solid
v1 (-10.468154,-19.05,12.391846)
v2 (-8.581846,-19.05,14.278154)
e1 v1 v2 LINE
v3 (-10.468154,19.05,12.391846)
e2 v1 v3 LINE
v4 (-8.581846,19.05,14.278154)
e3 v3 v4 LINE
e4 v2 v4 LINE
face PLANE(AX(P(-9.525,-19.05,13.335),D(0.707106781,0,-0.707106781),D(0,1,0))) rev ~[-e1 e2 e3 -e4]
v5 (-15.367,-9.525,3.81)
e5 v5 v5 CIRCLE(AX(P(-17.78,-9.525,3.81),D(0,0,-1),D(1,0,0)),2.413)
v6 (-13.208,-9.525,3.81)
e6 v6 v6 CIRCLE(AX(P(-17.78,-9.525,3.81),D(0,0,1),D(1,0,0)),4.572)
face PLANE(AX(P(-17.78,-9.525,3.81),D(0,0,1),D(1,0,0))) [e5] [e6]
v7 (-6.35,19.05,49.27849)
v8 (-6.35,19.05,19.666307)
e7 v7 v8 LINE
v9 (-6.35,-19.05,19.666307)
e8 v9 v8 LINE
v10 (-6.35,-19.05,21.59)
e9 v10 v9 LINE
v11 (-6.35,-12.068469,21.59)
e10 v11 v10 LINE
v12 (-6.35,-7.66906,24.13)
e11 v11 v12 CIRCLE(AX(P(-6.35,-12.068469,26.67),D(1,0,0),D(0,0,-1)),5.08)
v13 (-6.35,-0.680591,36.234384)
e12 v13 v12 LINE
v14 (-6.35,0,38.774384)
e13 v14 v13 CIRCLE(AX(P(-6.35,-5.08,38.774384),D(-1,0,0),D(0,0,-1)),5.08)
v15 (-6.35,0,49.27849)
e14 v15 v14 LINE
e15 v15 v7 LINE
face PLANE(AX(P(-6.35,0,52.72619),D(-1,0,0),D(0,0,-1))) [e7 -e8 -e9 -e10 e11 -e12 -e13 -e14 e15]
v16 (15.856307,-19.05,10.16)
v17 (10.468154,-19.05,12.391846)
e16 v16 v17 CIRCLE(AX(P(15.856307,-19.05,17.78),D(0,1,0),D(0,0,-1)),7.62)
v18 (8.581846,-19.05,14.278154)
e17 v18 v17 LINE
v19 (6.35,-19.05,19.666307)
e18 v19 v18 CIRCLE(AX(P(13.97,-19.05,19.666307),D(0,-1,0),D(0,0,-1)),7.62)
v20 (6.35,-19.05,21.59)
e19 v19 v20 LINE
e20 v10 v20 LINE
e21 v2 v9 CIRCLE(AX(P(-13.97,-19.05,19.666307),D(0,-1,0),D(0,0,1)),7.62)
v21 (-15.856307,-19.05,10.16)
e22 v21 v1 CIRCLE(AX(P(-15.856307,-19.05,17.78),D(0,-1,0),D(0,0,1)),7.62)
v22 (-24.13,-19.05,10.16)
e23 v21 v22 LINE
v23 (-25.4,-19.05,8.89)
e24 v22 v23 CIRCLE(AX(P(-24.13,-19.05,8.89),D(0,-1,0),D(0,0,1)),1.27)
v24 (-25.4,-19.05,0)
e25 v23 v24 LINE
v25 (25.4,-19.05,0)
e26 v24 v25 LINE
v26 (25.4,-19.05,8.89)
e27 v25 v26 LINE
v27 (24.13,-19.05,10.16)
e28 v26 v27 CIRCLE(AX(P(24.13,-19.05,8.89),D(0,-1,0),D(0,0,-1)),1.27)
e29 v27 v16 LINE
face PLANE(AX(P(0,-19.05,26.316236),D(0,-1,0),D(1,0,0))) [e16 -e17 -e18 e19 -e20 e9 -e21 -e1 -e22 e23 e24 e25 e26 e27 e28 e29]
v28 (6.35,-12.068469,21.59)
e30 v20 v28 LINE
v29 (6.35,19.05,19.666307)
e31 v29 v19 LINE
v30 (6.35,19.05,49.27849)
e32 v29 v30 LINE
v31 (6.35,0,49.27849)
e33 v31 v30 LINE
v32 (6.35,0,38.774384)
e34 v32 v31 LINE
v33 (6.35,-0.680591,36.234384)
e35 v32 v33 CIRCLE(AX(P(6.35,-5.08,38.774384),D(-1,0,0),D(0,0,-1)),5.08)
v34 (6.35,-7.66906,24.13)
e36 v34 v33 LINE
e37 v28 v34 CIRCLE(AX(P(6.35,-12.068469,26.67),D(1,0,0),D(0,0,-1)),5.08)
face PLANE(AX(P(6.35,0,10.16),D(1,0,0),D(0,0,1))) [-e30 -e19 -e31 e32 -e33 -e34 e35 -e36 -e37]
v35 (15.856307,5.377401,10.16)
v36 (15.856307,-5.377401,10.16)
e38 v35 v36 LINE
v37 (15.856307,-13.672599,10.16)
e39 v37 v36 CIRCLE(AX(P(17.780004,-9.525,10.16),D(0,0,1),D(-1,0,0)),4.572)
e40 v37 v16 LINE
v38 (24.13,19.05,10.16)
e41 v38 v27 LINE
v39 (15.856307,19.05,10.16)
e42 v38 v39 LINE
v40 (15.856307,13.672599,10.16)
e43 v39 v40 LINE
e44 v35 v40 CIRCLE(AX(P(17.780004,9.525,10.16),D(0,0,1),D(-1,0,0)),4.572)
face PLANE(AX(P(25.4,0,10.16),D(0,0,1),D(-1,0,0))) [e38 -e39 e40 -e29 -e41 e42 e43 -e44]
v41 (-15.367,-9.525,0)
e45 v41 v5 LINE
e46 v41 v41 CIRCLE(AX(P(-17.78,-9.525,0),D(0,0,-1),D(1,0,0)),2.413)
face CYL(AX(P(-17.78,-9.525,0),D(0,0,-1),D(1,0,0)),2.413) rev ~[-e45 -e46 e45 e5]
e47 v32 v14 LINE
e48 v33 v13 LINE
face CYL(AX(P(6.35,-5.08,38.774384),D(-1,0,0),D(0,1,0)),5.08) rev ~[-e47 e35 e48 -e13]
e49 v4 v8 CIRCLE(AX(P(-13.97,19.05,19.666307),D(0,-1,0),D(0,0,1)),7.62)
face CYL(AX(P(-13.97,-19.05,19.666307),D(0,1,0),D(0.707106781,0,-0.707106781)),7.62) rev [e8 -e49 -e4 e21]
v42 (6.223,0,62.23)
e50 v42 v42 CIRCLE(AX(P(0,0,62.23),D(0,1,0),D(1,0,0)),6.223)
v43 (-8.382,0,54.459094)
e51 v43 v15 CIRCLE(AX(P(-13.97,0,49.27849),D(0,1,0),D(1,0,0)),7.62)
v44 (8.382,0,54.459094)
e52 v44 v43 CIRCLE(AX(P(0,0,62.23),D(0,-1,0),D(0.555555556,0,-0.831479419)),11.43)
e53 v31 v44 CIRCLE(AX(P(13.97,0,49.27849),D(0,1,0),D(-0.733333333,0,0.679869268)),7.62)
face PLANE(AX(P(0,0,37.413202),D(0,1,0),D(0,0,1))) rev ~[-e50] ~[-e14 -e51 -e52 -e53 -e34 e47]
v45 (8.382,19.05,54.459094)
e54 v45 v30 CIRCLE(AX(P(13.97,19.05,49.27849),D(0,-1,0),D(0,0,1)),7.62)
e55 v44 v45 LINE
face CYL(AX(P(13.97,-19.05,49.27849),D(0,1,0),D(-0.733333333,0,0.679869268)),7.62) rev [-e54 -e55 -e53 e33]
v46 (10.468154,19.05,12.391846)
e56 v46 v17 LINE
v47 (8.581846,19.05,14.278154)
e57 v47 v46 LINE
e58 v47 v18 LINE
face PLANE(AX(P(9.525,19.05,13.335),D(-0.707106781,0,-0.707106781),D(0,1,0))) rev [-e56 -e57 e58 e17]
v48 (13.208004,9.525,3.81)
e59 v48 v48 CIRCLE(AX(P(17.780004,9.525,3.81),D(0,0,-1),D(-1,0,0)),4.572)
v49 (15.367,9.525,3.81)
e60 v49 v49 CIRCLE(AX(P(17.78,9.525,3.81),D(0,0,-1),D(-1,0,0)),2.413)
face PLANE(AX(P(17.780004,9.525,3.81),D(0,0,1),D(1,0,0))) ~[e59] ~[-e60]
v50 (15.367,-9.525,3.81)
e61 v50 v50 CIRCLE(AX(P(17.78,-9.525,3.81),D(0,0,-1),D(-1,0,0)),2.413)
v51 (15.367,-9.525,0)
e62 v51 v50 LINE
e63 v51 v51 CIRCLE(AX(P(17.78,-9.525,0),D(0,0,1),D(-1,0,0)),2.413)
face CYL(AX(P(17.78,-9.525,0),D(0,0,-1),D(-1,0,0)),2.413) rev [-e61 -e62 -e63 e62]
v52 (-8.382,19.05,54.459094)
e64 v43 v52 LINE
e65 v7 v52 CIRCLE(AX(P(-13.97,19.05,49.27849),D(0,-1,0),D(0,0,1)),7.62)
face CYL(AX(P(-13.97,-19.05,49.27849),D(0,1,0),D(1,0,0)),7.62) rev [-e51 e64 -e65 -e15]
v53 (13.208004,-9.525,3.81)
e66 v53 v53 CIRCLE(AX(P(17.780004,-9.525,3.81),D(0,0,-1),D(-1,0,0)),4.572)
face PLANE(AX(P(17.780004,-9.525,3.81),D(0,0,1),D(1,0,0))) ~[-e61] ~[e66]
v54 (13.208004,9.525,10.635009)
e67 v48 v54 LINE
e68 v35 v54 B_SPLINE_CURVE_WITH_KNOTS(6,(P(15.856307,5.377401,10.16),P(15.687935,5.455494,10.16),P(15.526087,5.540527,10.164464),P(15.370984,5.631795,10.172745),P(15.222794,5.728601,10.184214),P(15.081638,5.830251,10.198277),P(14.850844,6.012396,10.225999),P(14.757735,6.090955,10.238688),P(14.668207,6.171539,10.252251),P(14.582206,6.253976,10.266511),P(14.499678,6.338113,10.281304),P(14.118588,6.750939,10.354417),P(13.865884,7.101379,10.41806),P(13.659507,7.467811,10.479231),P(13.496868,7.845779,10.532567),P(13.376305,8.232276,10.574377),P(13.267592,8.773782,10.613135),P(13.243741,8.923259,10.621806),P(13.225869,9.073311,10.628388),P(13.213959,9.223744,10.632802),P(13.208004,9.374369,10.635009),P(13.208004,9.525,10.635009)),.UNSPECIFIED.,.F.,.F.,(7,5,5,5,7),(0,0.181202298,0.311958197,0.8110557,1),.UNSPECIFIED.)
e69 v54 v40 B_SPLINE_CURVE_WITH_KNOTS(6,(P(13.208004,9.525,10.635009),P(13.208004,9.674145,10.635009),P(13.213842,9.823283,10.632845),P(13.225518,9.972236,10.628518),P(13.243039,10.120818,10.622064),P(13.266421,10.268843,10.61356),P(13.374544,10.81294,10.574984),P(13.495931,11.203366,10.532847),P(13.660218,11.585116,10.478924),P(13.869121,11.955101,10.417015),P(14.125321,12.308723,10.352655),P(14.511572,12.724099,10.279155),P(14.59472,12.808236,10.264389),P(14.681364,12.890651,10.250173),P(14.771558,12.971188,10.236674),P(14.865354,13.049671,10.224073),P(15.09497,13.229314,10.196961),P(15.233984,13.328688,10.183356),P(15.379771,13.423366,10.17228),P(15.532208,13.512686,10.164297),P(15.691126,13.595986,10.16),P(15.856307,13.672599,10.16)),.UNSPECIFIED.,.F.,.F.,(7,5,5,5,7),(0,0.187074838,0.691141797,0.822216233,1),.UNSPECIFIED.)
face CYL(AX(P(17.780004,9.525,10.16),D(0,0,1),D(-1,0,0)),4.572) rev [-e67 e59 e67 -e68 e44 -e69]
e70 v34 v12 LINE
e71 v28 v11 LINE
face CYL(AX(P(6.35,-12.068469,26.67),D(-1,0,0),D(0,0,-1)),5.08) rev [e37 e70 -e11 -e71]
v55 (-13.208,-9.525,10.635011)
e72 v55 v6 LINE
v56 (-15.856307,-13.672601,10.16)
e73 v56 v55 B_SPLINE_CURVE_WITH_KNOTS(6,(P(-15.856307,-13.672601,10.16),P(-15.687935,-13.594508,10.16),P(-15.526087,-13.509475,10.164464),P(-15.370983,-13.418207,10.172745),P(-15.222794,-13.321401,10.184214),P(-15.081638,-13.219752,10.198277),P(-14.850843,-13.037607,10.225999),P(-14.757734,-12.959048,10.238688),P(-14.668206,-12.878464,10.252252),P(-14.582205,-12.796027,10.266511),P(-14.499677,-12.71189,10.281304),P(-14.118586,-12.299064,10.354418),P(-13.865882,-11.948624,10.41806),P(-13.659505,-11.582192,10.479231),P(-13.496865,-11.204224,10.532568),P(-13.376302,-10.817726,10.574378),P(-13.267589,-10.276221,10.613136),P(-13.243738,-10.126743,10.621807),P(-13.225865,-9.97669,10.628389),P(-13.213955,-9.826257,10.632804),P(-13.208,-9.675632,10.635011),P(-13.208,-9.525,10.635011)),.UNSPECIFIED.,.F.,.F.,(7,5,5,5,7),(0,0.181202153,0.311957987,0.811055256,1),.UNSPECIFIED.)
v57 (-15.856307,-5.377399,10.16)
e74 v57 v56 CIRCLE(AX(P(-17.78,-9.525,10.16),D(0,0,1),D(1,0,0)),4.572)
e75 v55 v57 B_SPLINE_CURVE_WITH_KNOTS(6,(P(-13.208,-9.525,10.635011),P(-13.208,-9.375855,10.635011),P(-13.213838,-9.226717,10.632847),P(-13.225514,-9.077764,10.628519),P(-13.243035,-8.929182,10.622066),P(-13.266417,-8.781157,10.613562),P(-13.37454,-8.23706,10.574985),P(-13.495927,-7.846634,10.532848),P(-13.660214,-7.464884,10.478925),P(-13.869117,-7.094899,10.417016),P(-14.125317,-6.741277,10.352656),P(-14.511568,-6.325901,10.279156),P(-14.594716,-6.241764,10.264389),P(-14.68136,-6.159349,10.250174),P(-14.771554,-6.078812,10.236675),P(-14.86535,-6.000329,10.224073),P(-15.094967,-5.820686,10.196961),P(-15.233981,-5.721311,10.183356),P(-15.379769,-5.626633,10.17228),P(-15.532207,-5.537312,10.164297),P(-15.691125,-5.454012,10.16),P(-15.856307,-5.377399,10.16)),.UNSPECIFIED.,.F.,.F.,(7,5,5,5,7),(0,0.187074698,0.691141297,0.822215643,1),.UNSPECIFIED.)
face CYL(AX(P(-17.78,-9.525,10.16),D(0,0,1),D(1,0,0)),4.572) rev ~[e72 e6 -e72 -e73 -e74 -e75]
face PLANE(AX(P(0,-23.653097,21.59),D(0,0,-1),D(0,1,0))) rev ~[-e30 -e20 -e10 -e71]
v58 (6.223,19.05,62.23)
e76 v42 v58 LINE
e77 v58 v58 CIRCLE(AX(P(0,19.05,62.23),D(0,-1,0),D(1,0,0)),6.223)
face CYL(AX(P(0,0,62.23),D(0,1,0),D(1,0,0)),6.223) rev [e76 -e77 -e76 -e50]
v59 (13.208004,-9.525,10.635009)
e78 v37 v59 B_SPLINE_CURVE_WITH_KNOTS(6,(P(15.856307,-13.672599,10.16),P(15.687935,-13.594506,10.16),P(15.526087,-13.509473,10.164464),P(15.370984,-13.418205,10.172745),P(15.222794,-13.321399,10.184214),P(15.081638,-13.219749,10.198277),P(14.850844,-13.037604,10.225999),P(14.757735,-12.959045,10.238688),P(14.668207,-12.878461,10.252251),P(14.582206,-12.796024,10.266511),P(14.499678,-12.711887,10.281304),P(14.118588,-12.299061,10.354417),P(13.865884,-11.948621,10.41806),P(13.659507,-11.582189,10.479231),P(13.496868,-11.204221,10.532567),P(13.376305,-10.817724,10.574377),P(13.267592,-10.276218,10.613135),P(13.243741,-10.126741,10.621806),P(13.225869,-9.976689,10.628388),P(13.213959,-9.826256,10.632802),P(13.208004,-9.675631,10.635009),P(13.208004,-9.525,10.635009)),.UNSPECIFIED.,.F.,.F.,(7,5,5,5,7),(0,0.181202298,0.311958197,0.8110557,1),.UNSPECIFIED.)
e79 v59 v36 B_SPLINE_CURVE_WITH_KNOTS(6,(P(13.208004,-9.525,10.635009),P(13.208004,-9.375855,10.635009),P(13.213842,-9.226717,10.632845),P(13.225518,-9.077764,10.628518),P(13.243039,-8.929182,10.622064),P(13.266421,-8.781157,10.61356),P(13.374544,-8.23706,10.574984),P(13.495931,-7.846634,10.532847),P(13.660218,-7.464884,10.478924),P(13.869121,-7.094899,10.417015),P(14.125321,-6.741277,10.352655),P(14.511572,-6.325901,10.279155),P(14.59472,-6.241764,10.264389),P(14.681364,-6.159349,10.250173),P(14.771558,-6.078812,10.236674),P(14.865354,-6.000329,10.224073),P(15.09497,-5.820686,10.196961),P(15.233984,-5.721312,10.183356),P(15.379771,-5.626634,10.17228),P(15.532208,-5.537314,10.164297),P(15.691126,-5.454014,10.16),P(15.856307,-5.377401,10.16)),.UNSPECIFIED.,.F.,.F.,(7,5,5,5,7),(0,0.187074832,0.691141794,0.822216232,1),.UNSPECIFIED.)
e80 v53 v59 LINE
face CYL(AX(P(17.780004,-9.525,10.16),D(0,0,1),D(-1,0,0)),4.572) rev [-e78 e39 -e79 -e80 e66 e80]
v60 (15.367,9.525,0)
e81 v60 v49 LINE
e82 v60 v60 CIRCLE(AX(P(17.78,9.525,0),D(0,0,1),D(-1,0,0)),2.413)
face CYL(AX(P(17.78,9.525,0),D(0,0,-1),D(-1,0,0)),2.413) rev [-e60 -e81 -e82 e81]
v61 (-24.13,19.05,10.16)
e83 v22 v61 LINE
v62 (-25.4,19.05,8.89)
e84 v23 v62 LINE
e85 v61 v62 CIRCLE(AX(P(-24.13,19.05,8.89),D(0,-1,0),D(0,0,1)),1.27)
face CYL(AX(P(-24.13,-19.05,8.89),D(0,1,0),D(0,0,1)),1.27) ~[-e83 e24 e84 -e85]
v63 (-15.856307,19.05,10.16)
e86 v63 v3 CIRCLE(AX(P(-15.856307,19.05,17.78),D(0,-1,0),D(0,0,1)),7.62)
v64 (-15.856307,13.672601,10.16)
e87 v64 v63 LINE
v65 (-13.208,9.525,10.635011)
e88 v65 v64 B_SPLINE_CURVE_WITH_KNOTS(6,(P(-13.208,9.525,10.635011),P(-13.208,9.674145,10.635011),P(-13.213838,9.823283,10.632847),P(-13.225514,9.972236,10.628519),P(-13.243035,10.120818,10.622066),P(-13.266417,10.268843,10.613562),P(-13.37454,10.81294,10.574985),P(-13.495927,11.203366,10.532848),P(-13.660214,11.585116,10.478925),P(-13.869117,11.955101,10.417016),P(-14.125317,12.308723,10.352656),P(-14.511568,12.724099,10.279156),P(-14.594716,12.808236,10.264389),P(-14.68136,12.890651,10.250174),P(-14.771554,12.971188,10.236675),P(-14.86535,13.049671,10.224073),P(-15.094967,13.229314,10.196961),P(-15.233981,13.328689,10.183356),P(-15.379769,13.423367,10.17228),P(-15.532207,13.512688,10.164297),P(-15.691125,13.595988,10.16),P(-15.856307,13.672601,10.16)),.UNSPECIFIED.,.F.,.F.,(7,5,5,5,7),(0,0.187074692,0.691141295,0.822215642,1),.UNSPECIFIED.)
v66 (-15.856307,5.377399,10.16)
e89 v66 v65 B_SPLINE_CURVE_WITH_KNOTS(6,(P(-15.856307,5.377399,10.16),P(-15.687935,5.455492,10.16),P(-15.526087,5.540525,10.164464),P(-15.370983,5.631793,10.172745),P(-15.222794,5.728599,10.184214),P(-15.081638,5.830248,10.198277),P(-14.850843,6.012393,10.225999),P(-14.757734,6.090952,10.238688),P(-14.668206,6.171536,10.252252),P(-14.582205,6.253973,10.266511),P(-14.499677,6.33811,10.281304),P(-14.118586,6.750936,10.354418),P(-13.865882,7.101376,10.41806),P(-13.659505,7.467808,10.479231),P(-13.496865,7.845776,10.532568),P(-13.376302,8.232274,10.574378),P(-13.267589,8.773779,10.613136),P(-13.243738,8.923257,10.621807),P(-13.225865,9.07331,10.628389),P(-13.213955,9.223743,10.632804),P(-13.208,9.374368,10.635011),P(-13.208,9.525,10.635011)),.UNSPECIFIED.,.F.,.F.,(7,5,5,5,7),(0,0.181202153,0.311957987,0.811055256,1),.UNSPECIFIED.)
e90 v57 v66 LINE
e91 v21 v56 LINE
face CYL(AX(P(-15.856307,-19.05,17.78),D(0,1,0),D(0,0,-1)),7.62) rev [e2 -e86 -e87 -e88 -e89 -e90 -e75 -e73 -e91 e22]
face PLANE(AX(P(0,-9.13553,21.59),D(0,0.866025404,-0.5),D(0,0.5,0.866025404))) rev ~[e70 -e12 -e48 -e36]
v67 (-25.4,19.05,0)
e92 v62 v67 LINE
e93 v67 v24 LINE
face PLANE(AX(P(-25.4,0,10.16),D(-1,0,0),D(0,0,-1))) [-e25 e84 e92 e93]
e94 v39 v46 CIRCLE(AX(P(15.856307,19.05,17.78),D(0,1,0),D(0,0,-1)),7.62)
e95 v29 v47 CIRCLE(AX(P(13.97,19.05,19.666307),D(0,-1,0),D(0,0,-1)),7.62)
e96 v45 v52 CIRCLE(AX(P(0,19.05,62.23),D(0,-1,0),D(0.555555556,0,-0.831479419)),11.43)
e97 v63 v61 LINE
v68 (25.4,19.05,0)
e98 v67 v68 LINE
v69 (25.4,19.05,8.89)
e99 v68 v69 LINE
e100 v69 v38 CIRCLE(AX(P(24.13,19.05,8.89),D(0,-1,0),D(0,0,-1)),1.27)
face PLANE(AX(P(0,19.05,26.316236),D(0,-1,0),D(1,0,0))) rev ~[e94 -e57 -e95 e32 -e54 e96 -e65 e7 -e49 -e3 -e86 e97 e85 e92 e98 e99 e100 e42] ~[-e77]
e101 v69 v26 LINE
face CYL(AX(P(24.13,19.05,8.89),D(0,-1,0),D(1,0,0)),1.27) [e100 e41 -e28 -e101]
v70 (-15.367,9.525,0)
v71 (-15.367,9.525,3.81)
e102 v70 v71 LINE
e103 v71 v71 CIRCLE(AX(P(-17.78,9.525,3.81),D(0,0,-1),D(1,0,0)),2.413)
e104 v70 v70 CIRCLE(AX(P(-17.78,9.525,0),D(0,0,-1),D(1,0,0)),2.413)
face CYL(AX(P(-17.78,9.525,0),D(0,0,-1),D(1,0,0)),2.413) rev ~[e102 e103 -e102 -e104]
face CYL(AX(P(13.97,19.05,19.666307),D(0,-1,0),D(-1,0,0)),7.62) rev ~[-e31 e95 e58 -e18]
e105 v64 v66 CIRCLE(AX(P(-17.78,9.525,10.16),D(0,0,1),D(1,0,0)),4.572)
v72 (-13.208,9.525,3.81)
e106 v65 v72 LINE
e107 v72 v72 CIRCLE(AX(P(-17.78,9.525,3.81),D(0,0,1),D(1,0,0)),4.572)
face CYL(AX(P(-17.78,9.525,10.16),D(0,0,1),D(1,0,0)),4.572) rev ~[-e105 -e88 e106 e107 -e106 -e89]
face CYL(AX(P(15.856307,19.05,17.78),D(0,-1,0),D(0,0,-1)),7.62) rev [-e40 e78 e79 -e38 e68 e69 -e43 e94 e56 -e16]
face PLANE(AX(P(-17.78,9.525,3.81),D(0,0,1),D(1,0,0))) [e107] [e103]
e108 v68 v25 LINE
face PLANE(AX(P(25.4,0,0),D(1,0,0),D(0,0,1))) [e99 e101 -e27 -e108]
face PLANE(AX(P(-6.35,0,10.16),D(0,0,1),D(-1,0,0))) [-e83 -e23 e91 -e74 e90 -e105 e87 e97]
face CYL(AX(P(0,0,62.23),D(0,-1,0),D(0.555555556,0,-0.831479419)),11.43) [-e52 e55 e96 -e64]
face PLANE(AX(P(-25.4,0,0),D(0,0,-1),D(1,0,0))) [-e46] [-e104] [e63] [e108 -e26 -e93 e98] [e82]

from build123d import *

# Parameters (mm, degrees)
F0_R          = 6.223
F1_DEPTH      = 19.05
F2_SIZE       = 6.35
F4_R          = 7.62
F3_R          = 2.413
F5_DEPTH      = 73.661
F6_R          = 4.572
F7_DEPTH      = 6.35
F7_DEPTH_BACK = 63.501
F8_R          = 1.27
F10_DEPTH     = 25.4
F11_R         = 5.08


# Not quite as in the source:
# - a pattern or mirror of a feature is missing from the dataset's text; its kind, count and spacing are read off the source's solid


with BuildPart() as f1:
    # F0 (on Front) → F1 (new body, symmetric)
    with BuildSketch(Plane.XZ):
        with BuildLine():
            Line((-25.4, 10.16), (-25.4, 0))
            Line((-25.4, 0), (25.4, 0))
            Line((25.4, 0), (25.4, 10.16))
            Line((25.4, 10.16), (6.35, 10.16))
            Line((6.35, 10.16), (6.35, 52.7261902376))
            ThreePointArc((6.35, 52.7261902376), (0, 73.66), (-6.35, 52.7261902376))
            Line((-6.35, 52.7261902376), (-6.35, 10.16))
            Line((-6.35, 10.16), (-25.4, 10.16))
        make_face()
        with Locations((0, 62.23)):
            Circle(F0_R, mode=Mode.SUBTRACT)
    extrude(amount=F1_DEPTH, both=True)

    # F2
    f2_edges = [f1.edges().sort_by_distance(p)[0] for p in [
        (-6.35, 0, 10.16),
        (6.35, 0, 10.16),
    ]]
    chamfer(f2_edges, length=F2_SIZE)

    # F4
    f4_edges = [f1.edges().sort_by_distance(p)[0] for p in [
        (-6.35, 0, 52.72619),
        (-6.35, 0, 16.51),
        (-12.7, 0, 10.16),
        (12.7, 0, 10.16),
        (6.35, 0, 16.51),
        (6.35, 0, 52.72619),
    ]]
    fillet(f4_edges, radius=F4_R)

    # F3 (on face) → F5 (cut, through all)
    with BuildSketch(Plane(origin=(0, 0, 0), x_dir=(1, 0, 0), z_dir=(0, 0, -1))):
        with Locations((-17.78, 9.525)):
            Circle(F3_R)
        with Locations((-17.78, -9.525)):
            Circle(F3_R)
    f5 = extrude(amount=-F5_DEPTH, mode=Mode.SUBTRACT)

    # F5_copies: F5 across plane
    add(f5.mirror(Plane(origin=(0, 0, 0), x_dir=(0, 0, 1), z_dir=(1, 0, 0))), mode=Mode.SUBTRACT)

    # F6 (on face) → F7 (cut, two sides)
    with BuildSketch(Plane.XY.offset(10.16)) as f7_sk:
        with Locations((-17.78, 9.525)):
            Circle(F6_R)
        with Locations((-17.78, -9.525)):
            Circle(F6_R)
    f7 = extrude(amount=-F7_DEPTH, mode=Mode.SUBTRACT) + extrude(f7_sk.sketch, amount=F7_DEPTH_BACK, mode=Mode.SUBTRACT)

    # F7_copies: F7 across plane
    add(f7.mirror(Plane(origin=(2e-06, 0, 0), x_dir=(0, 0, 1), z_dir=(1, 0, 0))), mode=Mode.SUBTRACT)

    # F8
    f8_edges = [f1.edges().sort_by_distance(p)[0] for p in [
        (-25.4, 0, 10.16),
        (25.4, 0, 10.16),
    ]]
    fillet(f8_edges, radius=F8_R)

    # F9 (on Right) → F10 (cut, symmetric)
    with BuildSketch(Plane.YZ):
        Polygon((0, 37.4132022262), (0, 76.8906995654), (-23.6530974507, 76.8906995654), (-23.6530974507, 21.59), (-9.1355300647, 21.59), align=None)
    extrude(amount=F10_DEPTH, both=True, mode=Mode.SUBTRACT)

    # F11
    f11_edges = [f1.edges().sort_by_distance(p)[0] for p in [
        (0, 0, 37.413202),
        (0, -9.13553, 21.59),
    ]]
    fillet(f11_edges, radius=F11_R)


solid = f1.part
